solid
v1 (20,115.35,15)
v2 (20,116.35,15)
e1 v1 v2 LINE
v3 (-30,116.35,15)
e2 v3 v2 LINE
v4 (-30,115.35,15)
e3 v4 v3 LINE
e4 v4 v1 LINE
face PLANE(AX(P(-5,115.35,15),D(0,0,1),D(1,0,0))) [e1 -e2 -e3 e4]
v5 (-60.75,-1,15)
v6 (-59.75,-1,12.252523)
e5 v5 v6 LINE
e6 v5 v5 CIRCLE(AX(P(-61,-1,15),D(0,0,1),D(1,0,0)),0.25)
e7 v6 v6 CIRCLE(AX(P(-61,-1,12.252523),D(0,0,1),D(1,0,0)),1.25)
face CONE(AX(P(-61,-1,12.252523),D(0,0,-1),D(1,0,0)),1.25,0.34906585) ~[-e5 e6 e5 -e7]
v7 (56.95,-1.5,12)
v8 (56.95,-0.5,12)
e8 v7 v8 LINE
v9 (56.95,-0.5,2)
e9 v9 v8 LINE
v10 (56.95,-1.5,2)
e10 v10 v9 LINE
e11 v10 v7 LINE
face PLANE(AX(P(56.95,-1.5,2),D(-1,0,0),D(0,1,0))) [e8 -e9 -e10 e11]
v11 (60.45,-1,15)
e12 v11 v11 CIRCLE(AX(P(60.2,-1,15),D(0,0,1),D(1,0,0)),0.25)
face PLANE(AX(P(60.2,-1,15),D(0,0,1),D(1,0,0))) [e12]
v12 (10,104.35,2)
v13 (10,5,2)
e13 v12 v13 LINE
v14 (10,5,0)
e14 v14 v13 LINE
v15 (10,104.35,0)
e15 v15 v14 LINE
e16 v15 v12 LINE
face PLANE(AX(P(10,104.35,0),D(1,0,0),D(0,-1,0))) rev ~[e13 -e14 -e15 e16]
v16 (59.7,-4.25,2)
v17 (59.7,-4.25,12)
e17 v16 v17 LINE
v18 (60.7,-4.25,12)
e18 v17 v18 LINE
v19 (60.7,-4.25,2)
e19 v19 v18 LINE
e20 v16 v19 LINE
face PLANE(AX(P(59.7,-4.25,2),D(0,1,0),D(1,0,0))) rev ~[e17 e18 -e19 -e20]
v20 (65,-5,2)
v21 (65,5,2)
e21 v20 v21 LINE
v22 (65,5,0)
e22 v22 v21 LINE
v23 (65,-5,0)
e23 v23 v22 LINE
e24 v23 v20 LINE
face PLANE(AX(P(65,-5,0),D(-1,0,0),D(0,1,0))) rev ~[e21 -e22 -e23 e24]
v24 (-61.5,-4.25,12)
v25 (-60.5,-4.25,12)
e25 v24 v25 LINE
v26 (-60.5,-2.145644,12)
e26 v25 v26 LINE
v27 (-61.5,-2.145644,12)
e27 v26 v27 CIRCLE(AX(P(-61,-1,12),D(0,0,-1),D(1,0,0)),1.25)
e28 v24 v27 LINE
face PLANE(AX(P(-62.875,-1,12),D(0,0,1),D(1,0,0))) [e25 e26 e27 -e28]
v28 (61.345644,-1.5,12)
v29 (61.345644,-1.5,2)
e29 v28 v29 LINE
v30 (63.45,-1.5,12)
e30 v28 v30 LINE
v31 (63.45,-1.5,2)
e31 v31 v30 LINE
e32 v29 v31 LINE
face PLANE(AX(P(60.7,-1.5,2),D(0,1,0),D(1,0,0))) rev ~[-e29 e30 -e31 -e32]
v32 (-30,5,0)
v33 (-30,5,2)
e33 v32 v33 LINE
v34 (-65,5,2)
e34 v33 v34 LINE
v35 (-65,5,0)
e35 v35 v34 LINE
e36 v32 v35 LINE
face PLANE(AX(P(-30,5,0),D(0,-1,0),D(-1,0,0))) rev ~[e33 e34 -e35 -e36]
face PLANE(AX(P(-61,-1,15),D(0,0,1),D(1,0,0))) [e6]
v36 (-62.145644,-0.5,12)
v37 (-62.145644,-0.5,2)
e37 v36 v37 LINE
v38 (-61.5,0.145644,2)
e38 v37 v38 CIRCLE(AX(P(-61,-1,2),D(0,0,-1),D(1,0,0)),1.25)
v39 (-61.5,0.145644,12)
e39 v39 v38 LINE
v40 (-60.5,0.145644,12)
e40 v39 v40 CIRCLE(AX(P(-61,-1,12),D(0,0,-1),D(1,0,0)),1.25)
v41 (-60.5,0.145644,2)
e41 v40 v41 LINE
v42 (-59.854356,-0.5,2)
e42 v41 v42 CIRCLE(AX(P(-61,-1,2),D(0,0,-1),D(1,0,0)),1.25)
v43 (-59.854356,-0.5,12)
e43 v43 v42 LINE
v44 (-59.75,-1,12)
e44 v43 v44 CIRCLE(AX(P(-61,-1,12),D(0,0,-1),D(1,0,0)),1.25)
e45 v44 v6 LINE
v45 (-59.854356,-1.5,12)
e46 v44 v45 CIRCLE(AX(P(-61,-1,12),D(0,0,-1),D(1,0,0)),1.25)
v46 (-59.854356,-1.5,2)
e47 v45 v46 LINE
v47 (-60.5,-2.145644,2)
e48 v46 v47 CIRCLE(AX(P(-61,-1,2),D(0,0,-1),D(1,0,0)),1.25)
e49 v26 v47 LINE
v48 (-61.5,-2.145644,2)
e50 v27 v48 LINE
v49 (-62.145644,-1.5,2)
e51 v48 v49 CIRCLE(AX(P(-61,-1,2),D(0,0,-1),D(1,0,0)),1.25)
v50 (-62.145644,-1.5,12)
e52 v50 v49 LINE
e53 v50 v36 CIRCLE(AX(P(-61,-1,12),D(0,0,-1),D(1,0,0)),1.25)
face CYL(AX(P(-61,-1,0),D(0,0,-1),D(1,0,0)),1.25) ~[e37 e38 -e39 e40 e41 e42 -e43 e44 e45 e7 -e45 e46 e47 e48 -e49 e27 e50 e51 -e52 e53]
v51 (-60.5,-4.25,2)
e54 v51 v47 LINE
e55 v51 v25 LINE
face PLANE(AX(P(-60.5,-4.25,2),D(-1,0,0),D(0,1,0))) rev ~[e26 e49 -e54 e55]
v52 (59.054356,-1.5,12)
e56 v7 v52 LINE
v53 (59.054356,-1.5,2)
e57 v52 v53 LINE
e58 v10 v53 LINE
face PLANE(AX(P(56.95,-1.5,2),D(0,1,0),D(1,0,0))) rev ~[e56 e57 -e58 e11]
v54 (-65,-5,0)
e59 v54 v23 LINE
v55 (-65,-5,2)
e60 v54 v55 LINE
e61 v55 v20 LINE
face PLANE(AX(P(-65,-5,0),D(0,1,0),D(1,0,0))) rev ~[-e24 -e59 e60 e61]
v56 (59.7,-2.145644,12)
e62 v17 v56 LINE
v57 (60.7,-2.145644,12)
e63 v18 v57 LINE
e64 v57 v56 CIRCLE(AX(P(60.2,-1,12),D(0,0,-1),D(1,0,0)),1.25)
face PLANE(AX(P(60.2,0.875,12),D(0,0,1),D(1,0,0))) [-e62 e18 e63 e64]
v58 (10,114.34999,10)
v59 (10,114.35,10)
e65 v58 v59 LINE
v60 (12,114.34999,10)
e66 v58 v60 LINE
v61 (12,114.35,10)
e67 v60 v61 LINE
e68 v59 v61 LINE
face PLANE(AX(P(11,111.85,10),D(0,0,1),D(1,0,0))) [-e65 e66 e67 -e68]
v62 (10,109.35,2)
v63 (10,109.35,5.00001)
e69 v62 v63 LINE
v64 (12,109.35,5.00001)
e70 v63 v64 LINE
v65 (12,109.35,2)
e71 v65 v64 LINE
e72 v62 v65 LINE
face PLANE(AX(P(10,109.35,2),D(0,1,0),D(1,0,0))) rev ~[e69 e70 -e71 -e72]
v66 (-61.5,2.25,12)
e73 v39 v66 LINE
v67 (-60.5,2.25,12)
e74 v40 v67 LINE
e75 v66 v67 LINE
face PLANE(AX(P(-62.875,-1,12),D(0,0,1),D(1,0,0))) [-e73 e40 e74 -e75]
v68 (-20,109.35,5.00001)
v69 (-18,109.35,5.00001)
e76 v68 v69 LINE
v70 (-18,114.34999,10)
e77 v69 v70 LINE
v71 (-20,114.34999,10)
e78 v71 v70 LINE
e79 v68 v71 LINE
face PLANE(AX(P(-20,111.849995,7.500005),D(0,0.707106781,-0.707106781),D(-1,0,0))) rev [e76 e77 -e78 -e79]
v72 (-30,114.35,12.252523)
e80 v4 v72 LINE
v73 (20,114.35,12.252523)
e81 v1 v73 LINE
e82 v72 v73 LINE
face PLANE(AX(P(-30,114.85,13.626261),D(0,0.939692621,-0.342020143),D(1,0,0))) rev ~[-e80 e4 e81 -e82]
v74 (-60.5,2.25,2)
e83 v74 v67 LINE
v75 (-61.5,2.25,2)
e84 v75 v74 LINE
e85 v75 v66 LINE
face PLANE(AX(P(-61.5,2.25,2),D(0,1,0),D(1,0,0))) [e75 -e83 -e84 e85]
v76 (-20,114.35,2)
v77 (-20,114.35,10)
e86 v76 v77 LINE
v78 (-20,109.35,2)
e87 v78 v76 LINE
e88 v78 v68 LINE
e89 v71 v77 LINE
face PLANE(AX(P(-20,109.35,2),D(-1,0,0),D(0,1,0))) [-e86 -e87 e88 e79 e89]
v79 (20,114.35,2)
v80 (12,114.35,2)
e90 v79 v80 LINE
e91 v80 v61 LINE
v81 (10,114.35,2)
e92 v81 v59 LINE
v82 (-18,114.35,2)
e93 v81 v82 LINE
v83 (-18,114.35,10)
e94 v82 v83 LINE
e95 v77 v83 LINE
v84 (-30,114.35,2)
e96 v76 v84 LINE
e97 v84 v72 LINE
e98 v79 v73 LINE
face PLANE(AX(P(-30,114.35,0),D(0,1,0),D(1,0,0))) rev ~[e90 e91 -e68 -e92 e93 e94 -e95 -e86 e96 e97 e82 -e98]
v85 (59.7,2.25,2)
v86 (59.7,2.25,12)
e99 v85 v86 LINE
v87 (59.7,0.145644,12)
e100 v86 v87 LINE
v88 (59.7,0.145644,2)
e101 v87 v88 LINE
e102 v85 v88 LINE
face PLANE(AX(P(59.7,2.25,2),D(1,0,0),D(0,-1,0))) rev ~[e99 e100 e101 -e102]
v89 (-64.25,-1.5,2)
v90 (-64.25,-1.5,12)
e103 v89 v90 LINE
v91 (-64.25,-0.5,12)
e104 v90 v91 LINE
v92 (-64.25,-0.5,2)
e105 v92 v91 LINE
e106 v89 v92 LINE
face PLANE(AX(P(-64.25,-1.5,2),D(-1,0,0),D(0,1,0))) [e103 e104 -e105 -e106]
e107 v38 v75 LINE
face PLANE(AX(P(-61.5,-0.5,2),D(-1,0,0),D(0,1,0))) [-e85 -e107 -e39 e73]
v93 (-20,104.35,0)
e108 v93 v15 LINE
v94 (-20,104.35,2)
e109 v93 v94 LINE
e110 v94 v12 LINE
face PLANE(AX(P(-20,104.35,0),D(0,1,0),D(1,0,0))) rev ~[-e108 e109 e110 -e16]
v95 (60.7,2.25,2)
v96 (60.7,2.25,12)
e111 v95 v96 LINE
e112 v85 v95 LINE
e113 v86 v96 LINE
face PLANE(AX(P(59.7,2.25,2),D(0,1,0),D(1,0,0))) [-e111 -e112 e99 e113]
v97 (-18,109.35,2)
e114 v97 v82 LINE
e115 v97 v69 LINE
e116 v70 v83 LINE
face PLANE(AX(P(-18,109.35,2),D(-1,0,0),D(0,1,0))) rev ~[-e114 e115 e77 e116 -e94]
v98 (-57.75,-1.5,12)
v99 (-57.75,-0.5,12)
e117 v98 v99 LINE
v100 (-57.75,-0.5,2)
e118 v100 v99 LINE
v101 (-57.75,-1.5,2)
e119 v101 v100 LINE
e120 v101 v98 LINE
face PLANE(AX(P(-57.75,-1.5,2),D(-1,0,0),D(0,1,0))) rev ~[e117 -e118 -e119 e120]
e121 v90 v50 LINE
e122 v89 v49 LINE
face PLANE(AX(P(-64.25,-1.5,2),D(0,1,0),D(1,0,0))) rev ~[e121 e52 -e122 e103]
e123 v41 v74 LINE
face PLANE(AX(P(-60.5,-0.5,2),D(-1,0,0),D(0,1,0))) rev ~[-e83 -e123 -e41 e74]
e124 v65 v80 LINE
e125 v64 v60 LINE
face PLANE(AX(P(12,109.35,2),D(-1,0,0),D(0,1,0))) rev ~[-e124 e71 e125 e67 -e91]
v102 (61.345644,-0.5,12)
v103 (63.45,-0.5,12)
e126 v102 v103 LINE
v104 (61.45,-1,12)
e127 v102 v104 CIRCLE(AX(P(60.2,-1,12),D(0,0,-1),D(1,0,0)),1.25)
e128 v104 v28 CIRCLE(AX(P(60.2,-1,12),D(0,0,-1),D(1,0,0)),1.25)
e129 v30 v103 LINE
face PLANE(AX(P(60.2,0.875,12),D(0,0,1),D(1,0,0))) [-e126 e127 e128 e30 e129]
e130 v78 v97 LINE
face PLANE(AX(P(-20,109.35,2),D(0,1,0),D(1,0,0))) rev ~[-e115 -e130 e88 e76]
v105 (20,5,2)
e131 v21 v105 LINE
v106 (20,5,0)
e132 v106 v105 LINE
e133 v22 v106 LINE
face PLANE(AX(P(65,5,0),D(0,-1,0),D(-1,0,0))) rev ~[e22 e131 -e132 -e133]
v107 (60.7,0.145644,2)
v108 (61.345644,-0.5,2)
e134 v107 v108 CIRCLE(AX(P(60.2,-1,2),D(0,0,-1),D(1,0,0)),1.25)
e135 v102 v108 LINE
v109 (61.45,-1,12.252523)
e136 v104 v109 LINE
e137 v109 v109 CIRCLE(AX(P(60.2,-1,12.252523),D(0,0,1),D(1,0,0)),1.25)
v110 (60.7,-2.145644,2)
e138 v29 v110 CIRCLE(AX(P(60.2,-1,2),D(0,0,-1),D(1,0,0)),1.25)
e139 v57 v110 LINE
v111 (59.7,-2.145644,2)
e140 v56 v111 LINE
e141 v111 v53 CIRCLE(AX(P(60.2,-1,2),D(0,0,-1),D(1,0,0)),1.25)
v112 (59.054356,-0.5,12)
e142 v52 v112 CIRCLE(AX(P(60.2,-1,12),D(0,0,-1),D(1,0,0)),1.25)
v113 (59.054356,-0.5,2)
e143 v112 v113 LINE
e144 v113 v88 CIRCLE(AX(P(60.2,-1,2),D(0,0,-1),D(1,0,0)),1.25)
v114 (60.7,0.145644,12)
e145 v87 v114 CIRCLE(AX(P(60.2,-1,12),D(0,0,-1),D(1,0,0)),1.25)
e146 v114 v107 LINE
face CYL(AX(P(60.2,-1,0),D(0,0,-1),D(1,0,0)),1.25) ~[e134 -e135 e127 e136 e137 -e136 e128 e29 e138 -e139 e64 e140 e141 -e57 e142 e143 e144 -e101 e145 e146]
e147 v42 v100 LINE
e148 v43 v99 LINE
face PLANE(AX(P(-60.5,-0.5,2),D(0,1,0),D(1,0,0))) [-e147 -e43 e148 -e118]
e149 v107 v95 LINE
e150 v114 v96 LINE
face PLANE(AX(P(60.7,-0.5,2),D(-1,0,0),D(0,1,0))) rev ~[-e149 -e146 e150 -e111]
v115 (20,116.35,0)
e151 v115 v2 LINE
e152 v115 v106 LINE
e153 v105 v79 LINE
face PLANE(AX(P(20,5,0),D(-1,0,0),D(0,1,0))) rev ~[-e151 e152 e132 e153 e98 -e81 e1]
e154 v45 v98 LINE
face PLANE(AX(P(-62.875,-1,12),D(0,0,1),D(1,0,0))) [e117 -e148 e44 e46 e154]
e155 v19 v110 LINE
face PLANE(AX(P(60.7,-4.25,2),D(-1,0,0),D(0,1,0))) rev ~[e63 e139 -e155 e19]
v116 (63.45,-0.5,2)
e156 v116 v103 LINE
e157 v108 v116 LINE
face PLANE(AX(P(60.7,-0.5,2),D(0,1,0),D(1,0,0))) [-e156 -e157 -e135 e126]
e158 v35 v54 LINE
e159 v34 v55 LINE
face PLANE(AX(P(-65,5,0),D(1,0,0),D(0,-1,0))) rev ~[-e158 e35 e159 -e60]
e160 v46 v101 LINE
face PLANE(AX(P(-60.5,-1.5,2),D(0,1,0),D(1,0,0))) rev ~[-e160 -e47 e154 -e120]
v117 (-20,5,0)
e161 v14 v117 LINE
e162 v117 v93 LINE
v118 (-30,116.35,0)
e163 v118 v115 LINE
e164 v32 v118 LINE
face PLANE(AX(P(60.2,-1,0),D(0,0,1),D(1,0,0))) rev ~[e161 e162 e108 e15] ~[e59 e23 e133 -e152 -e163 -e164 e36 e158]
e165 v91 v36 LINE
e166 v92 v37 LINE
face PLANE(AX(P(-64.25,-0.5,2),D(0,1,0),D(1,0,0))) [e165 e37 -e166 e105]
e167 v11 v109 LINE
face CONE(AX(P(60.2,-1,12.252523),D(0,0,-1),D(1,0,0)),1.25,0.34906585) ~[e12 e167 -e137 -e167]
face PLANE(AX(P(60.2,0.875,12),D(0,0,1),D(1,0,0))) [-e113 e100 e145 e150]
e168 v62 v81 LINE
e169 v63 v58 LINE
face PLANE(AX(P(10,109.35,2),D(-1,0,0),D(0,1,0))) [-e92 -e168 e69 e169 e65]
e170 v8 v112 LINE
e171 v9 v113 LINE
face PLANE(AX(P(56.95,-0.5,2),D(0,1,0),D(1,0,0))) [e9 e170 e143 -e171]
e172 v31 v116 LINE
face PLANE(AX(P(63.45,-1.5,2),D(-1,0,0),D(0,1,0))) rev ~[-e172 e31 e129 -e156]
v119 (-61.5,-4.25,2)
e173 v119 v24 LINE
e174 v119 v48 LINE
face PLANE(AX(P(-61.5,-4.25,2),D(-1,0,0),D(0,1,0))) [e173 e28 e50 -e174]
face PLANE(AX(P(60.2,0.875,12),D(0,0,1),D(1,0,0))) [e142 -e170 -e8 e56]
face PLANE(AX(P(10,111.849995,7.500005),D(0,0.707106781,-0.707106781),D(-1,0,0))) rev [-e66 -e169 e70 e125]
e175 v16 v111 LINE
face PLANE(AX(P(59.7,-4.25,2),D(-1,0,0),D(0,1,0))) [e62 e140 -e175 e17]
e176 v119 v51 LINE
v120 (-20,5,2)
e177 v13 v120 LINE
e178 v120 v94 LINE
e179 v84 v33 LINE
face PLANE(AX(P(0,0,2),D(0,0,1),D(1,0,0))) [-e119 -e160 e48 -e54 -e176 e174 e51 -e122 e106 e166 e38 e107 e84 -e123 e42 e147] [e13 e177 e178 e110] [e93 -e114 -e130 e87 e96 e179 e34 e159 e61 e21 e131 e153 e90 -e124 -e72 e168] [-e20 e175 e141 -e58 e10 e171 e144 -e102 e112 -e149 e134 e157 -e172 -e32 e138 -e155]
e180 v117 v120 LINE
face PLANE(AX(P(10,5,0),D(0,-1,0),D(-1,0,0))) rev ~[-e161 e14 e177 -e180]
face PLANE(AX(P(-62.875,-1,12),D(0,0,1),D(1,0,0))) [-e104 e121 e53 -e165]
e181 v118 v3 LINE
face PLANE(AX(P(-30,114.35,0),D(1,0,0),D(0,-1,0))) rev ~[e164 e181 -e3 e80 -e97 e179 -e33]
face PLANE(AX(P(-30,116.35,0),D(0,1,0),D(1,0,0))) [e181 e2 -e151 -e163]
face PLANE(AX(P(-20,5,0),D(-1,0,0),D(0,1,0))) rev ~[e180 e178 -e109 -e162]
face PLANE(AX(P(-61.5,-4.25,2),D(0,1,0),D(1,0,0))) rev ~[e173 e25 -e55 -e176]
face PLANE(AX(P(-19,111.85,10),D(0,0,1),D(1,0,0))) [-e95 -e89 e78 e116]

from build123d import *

# Parameters (mm, degrees)
F0_R       = 1.25
F1_DEPTH   = 2
F0_W       = 50
F0_H       = 2
F2_DEPTH   = 15
F3_SIZE2   = 2.7474774195
F3_SIZE    = 1
F3_2_SIZE2 = 2.7474774195
F3_2_SIZE  = 1
F3_3_SIZE2 = 2.7474774195
F3_3_SIZE  = 1
F4_W       = 2.75
F4_H       = 1
F4_W_2     = 1
F4_H_2     = 2.75
F5_DEPTH   = 10
F6_W       = 2
F6_H       = 5
F7_DEPTH   = 8
F8_SIZE    = 4.99999


# Not quite as in the source:
# - a fillet or chamfer is up to 0.001 mm smaller than in the source, because OpenCascade refuses the exact size
# - a feature names something its author has since deleted; it is built from what else it names


with BuildPart() as f1:
    # F0 (on Top) → F1 (new body)
    with BuildSketch(Plane.XY):
        Polygon((-30, 5), (-65, 5), (-65, -5), (65, -5), (65, 5), (20, 5), (10, 5), (-20, 5), align=None)
        with Locations((-61, -1)):
            Circle(F0_R, mode=Mode.SUBTRACT)
        with Locations((60.2, -1)):
            Circle(F0_R, mode=Mode.SUBTRACT)
        with Locations((-61, -1)):
            Circle(F0_R)
        with Locations((60.2, -1)):
            Circle(F0_R)
        Polygon((-30, 114.35), (-30, 5), (-20, 5), (-20, 104.35), (10, 104.35), (10, 5), (20, 5), (20, 114.35), align=None)
    extrude(amount=F1_DEPTH)

    # F0 (on Top) → F2 (join)
    with BuildSketch(Plane.XY):
        with Locations((60.2, -1)):
            Circle(F0_R)
        with Locations((-61, -1)):
            Circle(F0_R)
        with Locations((-5, 115.35)):
            Rectangle(F0_W, F0_H)
    extrude(amount=F2_DEPTH)

    # F3
    f3_edges = [f1.edges().sort_by_distance(p)[0] for p in [
        (58.95, -1, 15),
    ]]
    f3_side = f1.faces().sort_by_distance((60.2, -1, 15))[0]
    chamfer(f3_edges, length=F3_SIZE, length2=F3_SIZE2, reference=f3_side)

    # F3#2
    f3_2_edges = [f1.edges().sort_by_distance(p)[0] for p in [
        (-62.25, -1, 15),
    ]]
    f3_2_side = f1.faces().sort_by_distance((-61, -1, 15))[0]
    chamfer(f3_2_edges, length=F3_2_SIZE, length2=F3_2_SIZE2, reference=f3_2_side)

    # F3#3
    f3_3_edges = [f1.edges().sort_by_distance(p)[0] for p in [
        (-5, 114.35, 15),
    ]]
    f3_3_side = f1.faces().sort_by_distance((-5, 115.35, 15))[0]
    chamfer(f3_3_edges, length=F3_3_SIZE, length2=F3_3_SIZE2, reference=f3_3_side)

    # F4 (on face) → F5 (join)
    with BuildSketch(Plane.XY.offset(2)):
        with Locations((-62.875, -1)):
            Rectangle(F4_W, F4_H)
        with Locations((-61, 0.875)):
            Rectangle(F4_W_2, F4_H_2)
        with Locations((-61, -1)):
            Rectangle(F4_W_2, F4_H)
        with Locations((-59.125, -1)):
            Rectangle(F4_W, F4_H)
        with Locations((-61, -2.875)):
            Rectangle(F4_W_2, F4_H_2)
        with Locations((60.2, 0.875)):
            Rectangle(F4_W_2, F4_H_2)
        with Locations((60.2, -1)):
            Rectangle(F4_W_2, F4_H)
        with Locations((58.325, -1)):
            Rectangle(F4_W, F4_H)
        with Locations((62.075, -1)):
            Rectangle(F4_W, F4_H)
        with Locations((60.2, -2.875)):
            Rectangle(F4_W_2, F4_H_2)
    extrude(amount=F5_DEPTH)

    # F6 (on face) → F7 (join)
    with BuildSketch(Plane.XY.offset(2)):
        with Locations((-19, 111.85)):
            Rectangle(F6_W, F6_H)
        with Locations((11, 111.85)):
            Rectangle(F6_W, F6_H)
    extrude(amount=F7_DEPTH)

    # F8 (size 5 in the source; OpenCascade refuses exactly that, so slightly less here)
    f8_edges = [f1.edges().sort_by_distance(p)[0] for p in [
        (-19, 109.35, 10),
        (11, 109.35, 10),
    ]]
    chamfer(f8_edges, length=F8_SIZE)


solid = f1.part
